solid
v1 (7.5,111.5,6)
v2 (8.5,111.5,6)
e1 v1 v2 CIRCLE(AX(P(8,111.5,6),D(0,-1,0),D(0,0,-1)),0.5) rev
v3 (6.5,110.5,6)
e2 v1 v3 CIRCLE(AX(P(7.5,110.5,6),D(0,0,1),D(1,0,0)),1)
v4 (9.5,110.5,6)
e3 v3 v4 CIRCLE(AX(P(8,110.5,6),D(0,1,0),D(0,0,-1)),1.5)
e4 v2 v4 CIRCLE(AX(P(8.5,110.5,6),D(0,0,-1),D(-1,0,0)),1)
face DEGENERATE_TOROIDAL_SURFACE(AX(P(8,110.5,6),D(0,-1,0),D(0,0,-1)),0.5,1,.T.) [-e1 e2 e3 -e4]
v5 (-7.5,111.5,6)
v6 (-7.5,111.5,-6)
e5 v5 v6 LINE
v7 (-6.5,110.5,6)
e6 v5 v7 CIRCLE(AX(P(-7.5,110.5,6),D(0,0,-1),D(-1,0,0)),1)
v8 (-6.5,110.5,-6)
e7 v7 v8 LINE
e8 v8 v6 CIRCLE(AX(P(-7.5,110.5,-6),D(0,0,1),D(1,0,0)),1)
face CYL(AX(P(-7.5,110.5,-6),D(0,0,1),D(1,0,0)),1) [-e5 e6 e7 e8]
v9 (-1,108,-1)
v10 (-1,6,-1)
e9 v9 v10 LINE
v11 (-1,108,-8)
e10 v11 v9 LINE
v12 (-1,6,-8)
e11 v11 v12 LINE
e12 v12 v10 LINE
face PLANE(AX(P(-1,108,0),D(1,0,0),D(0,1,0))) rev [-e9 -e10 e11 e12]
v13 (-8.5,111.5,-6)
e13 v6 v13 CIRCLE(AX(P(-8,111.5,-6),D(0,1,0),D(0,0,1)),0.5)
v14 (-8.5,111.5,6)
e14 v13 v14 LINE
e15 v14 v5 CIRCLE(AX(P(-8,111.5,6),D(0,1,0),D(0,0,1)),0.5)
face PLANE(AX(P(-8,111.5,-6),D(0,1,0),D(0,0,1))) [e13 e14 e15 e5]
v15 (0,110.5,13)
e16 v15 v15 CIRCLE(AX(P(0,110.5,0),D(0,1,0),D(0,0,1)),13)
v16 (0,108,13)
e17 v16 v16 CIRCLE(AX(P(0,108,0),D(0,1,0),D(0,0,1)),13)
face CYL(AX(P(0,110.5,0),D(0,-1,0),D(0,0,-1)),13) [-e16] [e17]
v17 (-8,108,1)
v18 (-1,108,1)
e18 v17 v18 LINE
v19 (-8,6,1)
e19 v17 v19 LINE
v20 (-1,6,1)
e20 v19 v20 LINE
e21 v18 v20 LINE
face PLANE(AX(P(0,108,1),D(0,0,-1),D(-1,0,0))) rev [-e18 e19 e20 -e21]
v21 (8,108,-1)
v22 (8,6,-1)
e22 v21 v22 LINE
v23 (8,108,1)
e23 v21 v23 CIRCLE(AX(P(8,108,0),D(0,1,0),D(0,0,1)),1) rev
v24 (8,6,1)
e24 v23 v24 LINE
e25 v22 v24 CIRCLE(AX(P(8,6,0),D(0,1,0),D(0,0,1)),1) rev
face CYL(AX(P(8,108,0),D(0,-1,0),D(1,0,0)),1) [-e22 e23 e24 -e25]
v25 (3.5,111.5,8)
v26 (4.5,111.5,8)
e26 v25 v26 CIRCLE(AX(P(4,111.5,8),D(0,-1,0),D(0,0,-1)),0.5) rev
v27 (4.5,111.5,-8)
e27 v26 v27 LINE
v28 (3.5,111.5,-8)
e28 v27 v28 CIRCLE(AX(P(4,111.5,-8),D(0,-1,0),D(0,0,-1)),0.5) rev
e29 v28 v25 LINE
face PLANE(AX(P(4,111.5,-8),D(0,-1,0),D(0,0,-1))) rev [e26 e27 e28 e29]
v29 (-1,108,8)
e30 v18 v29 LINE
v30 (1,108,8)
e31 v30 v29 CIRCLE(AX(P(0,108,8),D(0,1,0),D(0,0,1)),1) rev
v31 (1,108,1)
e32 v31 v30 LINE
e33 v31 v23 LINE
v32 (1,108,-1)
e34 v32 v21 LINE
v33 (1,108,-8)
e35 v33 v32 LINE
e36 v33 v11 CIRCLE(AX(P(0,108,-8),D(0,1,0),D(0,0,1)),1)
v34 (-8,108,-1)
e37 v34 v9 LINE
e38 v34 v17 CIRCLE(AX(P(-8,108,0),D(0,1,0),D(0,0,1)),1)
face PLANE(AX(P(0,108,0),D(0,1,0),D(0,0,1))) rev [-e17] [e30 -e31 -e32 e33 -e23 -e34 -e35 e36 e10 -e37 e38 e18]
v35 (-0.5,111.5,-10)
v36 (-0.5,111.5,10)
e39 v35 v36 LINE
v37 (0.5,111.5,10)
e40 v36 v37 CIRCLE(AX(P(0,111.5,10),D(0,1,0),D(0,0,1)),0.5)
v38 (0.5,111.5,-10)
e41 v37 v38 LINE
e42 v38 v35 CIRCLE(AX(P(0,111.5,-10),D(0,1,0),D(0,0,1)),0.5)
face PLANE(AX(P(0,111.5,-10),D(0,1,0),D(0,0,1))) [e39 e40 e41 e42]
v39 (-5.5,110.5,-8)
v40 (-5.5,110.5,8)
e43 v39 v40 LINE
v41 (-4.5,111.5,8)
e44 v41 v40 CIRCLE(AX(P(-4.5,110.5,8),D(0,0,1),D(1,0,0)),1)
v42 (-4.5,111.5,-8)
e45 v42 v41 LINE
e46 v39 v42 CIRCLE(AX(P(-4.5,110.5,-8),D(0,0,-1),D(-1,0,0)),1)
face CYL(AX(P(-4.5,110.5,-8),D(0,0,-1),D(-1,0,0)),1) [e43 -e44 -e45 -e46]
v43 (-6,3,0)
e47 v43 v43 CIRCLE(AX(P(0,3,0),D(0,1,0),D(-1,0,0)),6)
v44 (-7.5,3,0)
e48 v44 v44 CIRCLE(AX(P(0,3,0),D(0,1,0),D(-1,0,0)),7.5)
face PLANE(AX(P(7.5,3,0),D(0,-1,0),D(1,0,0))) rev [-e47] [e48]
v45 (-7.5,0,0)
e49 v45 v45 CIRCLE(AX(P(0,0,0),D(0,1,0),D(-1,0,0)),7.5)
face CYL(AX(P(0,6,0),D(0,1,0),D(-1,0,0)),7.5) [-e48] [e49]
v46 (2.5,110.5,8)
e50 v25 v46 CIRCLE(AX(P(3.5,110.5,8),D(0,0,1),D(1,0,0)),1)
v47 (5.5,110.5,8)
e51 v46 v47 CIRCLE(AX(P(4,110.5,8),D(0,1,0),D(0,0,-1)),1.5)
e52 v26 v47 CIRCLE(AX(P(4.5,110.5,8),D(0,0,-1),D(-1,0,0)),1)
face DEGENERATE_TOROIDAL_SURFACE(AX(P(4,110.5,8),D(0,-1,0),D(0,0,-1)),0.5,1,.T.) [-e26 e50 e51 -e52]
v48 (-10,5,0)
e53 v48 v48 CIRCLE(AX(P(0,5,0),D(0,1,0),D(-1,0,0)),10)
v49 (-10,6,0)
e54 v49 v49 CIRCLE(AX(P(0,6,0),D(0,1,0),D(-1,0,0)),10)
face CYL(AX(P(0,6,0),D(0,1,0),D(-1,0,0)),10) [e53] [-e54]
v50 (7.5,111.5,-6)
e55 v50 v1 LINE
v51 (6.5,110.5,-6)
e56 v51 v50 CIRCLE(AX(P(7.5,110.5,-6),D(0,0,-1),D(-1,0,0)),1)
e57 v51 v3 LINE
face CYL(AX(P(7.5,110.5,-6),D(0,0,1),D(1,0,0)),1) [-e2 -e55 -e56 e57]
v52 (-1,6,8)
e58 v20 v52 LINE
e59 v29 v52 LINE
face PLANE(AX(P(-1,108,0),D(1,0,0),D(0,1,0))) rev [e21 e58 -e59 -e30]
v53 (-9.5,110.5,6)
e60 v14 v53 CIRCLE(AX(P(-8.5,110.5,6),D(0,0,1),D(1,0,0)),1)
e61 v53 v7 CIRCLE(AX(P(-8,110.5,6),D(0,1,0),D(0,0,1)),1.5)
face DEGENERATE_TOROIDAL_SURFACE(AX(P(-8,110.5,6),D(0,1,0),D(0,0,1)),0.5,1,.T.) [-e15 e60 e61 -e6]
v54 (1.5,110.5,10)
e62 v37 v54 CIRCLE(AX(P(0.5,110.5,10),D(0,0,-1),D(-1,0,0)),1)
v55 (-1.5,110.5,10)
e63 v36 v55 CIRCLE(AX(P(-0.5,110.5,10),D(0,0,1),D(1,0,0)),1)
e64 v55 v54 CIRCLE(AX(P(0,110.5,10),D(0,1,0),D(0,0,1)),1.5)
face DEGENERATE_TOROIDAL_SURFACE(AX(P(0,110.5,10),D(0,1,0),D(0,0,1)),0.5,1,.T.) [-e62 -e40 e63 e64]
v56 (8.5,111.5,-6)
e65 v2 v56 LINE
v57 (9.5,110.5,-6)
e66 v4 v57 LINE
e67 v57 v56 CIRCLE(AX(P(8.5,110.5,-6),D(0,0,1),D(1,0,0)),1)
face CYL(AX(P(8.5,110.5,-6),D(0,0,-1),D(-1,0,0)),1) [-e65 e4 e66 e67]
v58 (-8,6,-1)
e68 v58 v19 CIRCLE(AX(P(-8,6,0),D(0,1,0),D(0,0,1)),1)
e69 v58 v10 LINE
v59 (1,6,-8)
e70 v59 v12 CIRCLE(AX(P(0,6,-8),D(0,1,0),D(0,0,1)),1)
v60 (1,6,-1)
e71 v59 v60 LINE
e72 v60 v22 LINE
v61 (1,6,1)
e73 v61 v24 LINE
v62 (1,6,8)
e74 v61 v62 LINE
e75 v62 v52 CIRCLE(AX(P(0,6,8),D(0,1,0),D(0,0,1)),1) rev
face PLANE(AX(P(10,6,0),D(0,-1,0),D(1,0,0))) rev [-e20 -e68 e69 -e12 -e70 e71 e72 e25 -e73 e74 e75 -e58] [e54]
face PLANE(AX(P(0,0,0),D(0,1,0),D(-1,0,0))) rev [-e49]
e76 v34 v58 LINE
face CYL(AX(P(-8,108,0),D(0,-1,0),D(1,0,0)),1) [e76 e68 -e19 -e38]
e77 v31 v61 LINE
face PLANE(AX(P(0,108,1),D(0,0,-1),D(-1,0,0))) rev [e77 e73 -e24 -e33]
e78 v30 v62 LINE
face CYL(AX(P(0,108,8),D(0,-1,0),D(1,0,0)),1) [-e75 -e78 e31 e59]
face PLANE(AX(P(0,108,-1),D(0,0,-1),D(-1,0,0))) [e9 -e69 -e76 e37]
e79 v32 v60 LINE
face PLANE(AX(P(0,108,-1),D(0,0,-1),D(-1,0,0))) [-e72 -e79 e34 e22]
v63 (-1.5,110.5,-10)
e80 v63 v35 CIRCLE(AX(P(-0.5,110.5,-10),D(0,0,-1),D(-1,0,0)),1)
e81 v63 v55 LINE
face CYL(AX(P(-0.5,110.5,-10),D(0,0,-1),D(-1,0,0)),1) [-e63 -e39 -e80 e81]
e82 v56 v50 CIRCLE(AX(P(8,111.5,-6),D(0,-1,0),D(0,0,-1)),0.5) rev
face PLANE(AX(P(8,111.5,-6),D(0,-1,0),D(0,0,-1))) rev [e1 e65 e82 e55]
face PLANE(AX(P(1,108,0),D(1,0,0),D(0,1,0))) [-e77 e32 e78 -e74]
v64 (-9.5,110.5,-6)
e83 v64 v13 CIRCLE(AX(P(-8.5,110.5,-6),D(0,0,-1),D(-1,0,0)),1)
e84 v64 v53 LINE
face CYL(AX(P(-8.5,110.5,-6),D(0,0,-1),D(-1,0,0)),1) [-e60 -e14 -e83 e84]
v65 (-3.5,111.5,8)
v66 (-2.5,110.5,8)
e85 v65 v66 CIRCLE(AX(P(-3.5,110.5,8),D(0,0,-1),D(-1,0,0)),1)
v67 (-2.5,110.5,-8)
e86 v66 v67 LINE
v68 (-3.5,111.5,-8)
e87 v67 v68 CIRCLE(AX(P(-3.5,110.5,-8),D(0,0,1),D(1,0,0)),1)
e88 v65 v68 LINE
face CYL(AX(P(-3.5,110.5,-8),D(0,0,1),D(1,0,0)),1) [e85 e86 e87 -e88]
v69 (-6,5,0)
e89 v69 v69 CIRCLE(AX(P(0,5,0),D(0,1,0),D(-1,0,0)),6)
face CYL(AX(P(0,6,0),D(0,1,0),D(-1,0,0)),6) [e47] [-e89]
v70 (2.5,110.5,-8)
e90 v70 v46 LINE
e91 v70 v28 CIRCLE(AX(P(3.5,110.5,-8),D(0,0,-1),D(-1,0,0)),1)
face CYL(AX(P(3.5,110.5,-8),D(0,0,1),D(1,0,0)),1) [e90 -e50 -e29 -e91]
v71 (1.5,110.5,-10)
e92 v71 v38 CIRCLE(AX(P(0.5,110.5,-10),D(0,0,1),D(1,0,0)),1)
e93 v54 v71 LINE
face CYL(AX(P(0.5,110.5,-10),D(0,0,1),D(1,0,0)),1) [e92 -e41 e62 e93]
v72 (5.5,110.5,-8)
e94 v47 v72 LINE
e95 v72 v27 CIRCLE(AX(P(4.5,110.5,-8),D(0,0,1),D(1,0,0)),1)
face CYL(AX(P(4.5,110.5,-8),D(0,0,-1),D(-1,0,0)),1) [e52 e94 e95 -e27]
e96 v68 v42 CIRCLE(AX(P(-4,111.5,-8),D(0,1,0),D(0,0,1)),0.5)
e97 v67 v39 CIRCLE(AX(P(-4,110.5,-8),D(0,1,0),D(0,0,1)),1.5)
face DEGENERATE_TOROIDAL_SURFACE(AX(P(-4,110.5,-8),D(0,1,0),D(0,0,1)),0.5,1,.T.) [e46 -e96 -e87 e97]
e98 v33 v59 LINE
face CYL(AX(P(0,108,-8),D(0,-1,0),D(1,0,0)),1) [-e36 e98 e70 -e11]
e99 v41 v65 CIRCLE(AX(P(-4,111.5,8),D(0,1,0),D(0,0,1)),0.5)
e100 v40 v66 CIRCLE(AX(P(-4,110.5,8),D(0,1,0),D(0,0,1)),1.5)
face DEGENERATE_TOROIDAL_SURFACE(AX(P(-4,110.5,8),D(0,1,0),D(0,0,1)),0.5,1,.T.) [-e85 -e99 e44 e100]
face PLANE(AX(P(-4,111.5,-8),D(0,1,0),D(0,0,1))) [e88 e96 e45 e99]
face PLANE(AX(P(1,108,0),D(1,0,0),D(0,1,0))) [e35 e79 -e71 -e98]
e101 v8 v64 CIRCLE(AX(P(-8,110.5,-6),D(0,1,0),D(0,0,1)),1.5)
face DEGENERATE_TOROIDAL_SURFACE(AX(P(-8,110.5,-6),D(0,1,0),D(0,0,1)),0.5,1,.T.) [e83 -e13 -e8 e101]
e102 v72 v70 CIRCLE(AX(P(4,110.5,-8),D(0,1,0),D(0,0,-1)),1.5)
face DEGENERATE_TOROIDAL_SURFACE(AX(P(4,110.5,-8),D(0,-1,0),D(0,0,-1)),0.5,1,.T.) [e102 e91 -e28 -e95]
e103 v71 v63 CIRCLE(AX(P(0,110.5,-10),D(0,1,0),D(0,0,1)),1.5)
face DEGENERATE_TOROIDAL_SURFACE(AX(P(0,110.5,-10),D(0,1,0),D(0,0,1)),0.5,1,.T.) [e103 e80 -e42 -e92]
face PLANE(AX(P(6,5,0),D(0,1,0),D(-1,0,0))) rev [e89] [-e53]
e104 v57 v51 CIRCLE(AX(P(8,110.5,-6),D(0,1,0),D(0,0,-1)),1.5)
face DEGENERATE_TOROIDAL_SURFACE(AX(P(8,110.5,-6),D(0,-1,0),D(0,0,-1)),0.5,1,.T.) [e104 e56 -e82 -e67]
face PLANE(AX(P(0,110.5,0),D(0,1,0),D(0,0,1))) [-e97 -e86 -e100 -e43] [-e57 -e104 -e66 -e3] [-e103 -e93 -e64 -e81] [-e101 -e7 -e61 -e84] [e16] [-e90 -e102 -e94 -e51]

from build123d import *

# Parameters (mm, degrees)
SKETCH4_W           = 2
SKETCH4_H           = 2
BOSS_EXTRUDE5_DEPTH = 102
SKETCH5_R           = 13
BOSS_EXTRUDE6_DEPTH = 2.5
BOSS_EXTRUDE7_DEPTH = 1
FILLET1_R           = 1


with BuildPart() as part:
    # Sketch3 → Revolve1 (revolve)
    with BuildSketch(Plane.XY, mode=Mode.PRIVATE) as revolve1_sk:
        Polygon((0, 0), (7.5, 0), (7.5, 3), (6, 3), (6, 5), (10, 5), (10, 6), (0, 6), align=None)
    revolve(revolve1_sk.sketch.rotate(Axis((0, 6, 0), (0, -1, 0)), 180), axis=Axis((0, 6, 0), (0, -1, 0)))

    # Sketch4 → Boss-Extrude5 (add)
    with BuildSketch(Plane(origin=(0, 6, 0), x_dir=(1, 0, 0), z_dir=(0, 1, 0))):
        with BuildLine():
            ThreePointArc((1, 8), (0, 9), (-1, 8))
            Line((-1, 8), (-1, 1))
            Line((-1, 1), (1, 1))
            Line((1, 1), (1, 8))
        make_face()
        with BuildLine():
            Line((-1, -1), (-1, 1))
            Line((-1, 1), (-8, 1))
            ThreePointArc((-8, 1), (-9, 0), (-8, -1))
            Line((-8, -1), (-1, -1))
        make_face()
        with BuildLine():
            Line((1, -1), (-1, -1))
            Line((-1, -1), (-1, -8))
            ThreePointArc((-1, -8), (0, -9), (1, -8))
            Line((1, -8), (1, -1))
        make_face()
        with BuildLine():
            Line((8, 1), (1, 1))
            Line((1, 1), (1, -1))
            Line((1, -1), (8, -1))
            ThreePointArc((8, -1), (9, 0), (8, 1))
        make_face()
        Rectangle(SKETCH4_W, SKETCH4_H)
    extrude(amount=BOSS_EXTRUDE5_DEPTH)

    # Sketch5 → Boss-Extrude6 (add)
    with BuildSketch(Plane(origin=(0, 108, 0), x_dir=(1, 0, 0), z_dir=(0, 1, 0))):
        with Locations(Location((0, 0, 0), (0, 0, 270))):
            Circle(SKETCH5_R)
    extrude(amount=BOSS_EXTRUDE6_DEPTH)

    # Sketch8 → Boss-Extrude7 (add)
    with BuildSketch(Plane(origin=(0, 110.5, 0), x_dir=(1, 0, 0), z_dir=(0, 1, 0))):
        with BuildLine():
            Line((-1.5, 10), (-1.5, -10))
            ThreePointArc((-1.5, -10), (0, -11.5), (1.5, -10))
            Line((1.5, -10), (1.5, 10))
            ThreePointArc((1.5, 10), (0, 11.5), (-1.5, 10))
        make_face()
        with BuildLine():
            Line((-5.5, 8), (-5.5, -8))
            ThreePointArc((-5.5, -8), (-4, -9.5), (-2.5, -8))
            Line((-2.5, -8), (-2.5, 8))
            ThreePointArc((-2.5, 8), (-4, 9.5), (-5.5, 8))
        make_face()
        with BuildLine():
            Line((-9.5, 6), (-9.5, -6))
            ThreePointArc((-9.5, -6), (-8, -7.5), (-6.5, -6))
            Line((-6.5, -6), (-6.5, 6))
            ThreePointArc((-6.5, 6), (-8, 7.5), (-9.5, 6))
        make_face()
        with BuildLine():
            Line((6.5, 6), (6.5, -6))
            ThreePointArc((6.5, -6), (8, -7.5), (9.5, -6))
            Line((9.5, -6), (9.5, 6))
            ThreePointArc((9.5, 6), (8, 7.5), (6.5, 6))
        make_face()
        with BuildLine():
            Line((5.5, 8), (5.5, -8))
            ThreePointArc((5.5, -8), (4, -9.5), (2.5, -8))
            Line((2.5, -8), (2.5, 8))
            ThreePointArc((2.5, 8), (4, 9.5), (5.5, 8))
        make_face()
    extrude(amount=BOSS_EXTRUDE7_DEPTH)

    # Fillet1
    fillet1_edges = [part.edges().sort_by_distance(p)[0] for p in [
        (9.5, 111.5, 0),
        (8, 111.5, 7.5),
        (6.5, 111.5, 0),
        (8, 111.5, -7.5),
        (5.5, 111.5, 0),
        (4, 111.5, 9.5),
        (2.5, 111.5, 0),
        (4, 111.5, -9.5),
        (1.5, 111.5, 0),
        (0, 111.5, 11.5),
        (-1.5, 111.5, 0),
        (0, 111.5, -11.5),
        (-2.5, 111.5, 0),
        (-4, 111.5, 9.5),
        (-5.5, 111.5, 0),
        (-4, 111.5, -9.5),
        (-6.5, 111.5, 0),
        (-8, 111.5, 7.5),
        (-9.5, 111.5, 0),
        (-8, 111.5, -7.5),
    ]]
    fillet(fillet1_edges, radius=FILLET1_R - 0.0001)  # a hair under: the kernel refuses the full size


solid = part.part
